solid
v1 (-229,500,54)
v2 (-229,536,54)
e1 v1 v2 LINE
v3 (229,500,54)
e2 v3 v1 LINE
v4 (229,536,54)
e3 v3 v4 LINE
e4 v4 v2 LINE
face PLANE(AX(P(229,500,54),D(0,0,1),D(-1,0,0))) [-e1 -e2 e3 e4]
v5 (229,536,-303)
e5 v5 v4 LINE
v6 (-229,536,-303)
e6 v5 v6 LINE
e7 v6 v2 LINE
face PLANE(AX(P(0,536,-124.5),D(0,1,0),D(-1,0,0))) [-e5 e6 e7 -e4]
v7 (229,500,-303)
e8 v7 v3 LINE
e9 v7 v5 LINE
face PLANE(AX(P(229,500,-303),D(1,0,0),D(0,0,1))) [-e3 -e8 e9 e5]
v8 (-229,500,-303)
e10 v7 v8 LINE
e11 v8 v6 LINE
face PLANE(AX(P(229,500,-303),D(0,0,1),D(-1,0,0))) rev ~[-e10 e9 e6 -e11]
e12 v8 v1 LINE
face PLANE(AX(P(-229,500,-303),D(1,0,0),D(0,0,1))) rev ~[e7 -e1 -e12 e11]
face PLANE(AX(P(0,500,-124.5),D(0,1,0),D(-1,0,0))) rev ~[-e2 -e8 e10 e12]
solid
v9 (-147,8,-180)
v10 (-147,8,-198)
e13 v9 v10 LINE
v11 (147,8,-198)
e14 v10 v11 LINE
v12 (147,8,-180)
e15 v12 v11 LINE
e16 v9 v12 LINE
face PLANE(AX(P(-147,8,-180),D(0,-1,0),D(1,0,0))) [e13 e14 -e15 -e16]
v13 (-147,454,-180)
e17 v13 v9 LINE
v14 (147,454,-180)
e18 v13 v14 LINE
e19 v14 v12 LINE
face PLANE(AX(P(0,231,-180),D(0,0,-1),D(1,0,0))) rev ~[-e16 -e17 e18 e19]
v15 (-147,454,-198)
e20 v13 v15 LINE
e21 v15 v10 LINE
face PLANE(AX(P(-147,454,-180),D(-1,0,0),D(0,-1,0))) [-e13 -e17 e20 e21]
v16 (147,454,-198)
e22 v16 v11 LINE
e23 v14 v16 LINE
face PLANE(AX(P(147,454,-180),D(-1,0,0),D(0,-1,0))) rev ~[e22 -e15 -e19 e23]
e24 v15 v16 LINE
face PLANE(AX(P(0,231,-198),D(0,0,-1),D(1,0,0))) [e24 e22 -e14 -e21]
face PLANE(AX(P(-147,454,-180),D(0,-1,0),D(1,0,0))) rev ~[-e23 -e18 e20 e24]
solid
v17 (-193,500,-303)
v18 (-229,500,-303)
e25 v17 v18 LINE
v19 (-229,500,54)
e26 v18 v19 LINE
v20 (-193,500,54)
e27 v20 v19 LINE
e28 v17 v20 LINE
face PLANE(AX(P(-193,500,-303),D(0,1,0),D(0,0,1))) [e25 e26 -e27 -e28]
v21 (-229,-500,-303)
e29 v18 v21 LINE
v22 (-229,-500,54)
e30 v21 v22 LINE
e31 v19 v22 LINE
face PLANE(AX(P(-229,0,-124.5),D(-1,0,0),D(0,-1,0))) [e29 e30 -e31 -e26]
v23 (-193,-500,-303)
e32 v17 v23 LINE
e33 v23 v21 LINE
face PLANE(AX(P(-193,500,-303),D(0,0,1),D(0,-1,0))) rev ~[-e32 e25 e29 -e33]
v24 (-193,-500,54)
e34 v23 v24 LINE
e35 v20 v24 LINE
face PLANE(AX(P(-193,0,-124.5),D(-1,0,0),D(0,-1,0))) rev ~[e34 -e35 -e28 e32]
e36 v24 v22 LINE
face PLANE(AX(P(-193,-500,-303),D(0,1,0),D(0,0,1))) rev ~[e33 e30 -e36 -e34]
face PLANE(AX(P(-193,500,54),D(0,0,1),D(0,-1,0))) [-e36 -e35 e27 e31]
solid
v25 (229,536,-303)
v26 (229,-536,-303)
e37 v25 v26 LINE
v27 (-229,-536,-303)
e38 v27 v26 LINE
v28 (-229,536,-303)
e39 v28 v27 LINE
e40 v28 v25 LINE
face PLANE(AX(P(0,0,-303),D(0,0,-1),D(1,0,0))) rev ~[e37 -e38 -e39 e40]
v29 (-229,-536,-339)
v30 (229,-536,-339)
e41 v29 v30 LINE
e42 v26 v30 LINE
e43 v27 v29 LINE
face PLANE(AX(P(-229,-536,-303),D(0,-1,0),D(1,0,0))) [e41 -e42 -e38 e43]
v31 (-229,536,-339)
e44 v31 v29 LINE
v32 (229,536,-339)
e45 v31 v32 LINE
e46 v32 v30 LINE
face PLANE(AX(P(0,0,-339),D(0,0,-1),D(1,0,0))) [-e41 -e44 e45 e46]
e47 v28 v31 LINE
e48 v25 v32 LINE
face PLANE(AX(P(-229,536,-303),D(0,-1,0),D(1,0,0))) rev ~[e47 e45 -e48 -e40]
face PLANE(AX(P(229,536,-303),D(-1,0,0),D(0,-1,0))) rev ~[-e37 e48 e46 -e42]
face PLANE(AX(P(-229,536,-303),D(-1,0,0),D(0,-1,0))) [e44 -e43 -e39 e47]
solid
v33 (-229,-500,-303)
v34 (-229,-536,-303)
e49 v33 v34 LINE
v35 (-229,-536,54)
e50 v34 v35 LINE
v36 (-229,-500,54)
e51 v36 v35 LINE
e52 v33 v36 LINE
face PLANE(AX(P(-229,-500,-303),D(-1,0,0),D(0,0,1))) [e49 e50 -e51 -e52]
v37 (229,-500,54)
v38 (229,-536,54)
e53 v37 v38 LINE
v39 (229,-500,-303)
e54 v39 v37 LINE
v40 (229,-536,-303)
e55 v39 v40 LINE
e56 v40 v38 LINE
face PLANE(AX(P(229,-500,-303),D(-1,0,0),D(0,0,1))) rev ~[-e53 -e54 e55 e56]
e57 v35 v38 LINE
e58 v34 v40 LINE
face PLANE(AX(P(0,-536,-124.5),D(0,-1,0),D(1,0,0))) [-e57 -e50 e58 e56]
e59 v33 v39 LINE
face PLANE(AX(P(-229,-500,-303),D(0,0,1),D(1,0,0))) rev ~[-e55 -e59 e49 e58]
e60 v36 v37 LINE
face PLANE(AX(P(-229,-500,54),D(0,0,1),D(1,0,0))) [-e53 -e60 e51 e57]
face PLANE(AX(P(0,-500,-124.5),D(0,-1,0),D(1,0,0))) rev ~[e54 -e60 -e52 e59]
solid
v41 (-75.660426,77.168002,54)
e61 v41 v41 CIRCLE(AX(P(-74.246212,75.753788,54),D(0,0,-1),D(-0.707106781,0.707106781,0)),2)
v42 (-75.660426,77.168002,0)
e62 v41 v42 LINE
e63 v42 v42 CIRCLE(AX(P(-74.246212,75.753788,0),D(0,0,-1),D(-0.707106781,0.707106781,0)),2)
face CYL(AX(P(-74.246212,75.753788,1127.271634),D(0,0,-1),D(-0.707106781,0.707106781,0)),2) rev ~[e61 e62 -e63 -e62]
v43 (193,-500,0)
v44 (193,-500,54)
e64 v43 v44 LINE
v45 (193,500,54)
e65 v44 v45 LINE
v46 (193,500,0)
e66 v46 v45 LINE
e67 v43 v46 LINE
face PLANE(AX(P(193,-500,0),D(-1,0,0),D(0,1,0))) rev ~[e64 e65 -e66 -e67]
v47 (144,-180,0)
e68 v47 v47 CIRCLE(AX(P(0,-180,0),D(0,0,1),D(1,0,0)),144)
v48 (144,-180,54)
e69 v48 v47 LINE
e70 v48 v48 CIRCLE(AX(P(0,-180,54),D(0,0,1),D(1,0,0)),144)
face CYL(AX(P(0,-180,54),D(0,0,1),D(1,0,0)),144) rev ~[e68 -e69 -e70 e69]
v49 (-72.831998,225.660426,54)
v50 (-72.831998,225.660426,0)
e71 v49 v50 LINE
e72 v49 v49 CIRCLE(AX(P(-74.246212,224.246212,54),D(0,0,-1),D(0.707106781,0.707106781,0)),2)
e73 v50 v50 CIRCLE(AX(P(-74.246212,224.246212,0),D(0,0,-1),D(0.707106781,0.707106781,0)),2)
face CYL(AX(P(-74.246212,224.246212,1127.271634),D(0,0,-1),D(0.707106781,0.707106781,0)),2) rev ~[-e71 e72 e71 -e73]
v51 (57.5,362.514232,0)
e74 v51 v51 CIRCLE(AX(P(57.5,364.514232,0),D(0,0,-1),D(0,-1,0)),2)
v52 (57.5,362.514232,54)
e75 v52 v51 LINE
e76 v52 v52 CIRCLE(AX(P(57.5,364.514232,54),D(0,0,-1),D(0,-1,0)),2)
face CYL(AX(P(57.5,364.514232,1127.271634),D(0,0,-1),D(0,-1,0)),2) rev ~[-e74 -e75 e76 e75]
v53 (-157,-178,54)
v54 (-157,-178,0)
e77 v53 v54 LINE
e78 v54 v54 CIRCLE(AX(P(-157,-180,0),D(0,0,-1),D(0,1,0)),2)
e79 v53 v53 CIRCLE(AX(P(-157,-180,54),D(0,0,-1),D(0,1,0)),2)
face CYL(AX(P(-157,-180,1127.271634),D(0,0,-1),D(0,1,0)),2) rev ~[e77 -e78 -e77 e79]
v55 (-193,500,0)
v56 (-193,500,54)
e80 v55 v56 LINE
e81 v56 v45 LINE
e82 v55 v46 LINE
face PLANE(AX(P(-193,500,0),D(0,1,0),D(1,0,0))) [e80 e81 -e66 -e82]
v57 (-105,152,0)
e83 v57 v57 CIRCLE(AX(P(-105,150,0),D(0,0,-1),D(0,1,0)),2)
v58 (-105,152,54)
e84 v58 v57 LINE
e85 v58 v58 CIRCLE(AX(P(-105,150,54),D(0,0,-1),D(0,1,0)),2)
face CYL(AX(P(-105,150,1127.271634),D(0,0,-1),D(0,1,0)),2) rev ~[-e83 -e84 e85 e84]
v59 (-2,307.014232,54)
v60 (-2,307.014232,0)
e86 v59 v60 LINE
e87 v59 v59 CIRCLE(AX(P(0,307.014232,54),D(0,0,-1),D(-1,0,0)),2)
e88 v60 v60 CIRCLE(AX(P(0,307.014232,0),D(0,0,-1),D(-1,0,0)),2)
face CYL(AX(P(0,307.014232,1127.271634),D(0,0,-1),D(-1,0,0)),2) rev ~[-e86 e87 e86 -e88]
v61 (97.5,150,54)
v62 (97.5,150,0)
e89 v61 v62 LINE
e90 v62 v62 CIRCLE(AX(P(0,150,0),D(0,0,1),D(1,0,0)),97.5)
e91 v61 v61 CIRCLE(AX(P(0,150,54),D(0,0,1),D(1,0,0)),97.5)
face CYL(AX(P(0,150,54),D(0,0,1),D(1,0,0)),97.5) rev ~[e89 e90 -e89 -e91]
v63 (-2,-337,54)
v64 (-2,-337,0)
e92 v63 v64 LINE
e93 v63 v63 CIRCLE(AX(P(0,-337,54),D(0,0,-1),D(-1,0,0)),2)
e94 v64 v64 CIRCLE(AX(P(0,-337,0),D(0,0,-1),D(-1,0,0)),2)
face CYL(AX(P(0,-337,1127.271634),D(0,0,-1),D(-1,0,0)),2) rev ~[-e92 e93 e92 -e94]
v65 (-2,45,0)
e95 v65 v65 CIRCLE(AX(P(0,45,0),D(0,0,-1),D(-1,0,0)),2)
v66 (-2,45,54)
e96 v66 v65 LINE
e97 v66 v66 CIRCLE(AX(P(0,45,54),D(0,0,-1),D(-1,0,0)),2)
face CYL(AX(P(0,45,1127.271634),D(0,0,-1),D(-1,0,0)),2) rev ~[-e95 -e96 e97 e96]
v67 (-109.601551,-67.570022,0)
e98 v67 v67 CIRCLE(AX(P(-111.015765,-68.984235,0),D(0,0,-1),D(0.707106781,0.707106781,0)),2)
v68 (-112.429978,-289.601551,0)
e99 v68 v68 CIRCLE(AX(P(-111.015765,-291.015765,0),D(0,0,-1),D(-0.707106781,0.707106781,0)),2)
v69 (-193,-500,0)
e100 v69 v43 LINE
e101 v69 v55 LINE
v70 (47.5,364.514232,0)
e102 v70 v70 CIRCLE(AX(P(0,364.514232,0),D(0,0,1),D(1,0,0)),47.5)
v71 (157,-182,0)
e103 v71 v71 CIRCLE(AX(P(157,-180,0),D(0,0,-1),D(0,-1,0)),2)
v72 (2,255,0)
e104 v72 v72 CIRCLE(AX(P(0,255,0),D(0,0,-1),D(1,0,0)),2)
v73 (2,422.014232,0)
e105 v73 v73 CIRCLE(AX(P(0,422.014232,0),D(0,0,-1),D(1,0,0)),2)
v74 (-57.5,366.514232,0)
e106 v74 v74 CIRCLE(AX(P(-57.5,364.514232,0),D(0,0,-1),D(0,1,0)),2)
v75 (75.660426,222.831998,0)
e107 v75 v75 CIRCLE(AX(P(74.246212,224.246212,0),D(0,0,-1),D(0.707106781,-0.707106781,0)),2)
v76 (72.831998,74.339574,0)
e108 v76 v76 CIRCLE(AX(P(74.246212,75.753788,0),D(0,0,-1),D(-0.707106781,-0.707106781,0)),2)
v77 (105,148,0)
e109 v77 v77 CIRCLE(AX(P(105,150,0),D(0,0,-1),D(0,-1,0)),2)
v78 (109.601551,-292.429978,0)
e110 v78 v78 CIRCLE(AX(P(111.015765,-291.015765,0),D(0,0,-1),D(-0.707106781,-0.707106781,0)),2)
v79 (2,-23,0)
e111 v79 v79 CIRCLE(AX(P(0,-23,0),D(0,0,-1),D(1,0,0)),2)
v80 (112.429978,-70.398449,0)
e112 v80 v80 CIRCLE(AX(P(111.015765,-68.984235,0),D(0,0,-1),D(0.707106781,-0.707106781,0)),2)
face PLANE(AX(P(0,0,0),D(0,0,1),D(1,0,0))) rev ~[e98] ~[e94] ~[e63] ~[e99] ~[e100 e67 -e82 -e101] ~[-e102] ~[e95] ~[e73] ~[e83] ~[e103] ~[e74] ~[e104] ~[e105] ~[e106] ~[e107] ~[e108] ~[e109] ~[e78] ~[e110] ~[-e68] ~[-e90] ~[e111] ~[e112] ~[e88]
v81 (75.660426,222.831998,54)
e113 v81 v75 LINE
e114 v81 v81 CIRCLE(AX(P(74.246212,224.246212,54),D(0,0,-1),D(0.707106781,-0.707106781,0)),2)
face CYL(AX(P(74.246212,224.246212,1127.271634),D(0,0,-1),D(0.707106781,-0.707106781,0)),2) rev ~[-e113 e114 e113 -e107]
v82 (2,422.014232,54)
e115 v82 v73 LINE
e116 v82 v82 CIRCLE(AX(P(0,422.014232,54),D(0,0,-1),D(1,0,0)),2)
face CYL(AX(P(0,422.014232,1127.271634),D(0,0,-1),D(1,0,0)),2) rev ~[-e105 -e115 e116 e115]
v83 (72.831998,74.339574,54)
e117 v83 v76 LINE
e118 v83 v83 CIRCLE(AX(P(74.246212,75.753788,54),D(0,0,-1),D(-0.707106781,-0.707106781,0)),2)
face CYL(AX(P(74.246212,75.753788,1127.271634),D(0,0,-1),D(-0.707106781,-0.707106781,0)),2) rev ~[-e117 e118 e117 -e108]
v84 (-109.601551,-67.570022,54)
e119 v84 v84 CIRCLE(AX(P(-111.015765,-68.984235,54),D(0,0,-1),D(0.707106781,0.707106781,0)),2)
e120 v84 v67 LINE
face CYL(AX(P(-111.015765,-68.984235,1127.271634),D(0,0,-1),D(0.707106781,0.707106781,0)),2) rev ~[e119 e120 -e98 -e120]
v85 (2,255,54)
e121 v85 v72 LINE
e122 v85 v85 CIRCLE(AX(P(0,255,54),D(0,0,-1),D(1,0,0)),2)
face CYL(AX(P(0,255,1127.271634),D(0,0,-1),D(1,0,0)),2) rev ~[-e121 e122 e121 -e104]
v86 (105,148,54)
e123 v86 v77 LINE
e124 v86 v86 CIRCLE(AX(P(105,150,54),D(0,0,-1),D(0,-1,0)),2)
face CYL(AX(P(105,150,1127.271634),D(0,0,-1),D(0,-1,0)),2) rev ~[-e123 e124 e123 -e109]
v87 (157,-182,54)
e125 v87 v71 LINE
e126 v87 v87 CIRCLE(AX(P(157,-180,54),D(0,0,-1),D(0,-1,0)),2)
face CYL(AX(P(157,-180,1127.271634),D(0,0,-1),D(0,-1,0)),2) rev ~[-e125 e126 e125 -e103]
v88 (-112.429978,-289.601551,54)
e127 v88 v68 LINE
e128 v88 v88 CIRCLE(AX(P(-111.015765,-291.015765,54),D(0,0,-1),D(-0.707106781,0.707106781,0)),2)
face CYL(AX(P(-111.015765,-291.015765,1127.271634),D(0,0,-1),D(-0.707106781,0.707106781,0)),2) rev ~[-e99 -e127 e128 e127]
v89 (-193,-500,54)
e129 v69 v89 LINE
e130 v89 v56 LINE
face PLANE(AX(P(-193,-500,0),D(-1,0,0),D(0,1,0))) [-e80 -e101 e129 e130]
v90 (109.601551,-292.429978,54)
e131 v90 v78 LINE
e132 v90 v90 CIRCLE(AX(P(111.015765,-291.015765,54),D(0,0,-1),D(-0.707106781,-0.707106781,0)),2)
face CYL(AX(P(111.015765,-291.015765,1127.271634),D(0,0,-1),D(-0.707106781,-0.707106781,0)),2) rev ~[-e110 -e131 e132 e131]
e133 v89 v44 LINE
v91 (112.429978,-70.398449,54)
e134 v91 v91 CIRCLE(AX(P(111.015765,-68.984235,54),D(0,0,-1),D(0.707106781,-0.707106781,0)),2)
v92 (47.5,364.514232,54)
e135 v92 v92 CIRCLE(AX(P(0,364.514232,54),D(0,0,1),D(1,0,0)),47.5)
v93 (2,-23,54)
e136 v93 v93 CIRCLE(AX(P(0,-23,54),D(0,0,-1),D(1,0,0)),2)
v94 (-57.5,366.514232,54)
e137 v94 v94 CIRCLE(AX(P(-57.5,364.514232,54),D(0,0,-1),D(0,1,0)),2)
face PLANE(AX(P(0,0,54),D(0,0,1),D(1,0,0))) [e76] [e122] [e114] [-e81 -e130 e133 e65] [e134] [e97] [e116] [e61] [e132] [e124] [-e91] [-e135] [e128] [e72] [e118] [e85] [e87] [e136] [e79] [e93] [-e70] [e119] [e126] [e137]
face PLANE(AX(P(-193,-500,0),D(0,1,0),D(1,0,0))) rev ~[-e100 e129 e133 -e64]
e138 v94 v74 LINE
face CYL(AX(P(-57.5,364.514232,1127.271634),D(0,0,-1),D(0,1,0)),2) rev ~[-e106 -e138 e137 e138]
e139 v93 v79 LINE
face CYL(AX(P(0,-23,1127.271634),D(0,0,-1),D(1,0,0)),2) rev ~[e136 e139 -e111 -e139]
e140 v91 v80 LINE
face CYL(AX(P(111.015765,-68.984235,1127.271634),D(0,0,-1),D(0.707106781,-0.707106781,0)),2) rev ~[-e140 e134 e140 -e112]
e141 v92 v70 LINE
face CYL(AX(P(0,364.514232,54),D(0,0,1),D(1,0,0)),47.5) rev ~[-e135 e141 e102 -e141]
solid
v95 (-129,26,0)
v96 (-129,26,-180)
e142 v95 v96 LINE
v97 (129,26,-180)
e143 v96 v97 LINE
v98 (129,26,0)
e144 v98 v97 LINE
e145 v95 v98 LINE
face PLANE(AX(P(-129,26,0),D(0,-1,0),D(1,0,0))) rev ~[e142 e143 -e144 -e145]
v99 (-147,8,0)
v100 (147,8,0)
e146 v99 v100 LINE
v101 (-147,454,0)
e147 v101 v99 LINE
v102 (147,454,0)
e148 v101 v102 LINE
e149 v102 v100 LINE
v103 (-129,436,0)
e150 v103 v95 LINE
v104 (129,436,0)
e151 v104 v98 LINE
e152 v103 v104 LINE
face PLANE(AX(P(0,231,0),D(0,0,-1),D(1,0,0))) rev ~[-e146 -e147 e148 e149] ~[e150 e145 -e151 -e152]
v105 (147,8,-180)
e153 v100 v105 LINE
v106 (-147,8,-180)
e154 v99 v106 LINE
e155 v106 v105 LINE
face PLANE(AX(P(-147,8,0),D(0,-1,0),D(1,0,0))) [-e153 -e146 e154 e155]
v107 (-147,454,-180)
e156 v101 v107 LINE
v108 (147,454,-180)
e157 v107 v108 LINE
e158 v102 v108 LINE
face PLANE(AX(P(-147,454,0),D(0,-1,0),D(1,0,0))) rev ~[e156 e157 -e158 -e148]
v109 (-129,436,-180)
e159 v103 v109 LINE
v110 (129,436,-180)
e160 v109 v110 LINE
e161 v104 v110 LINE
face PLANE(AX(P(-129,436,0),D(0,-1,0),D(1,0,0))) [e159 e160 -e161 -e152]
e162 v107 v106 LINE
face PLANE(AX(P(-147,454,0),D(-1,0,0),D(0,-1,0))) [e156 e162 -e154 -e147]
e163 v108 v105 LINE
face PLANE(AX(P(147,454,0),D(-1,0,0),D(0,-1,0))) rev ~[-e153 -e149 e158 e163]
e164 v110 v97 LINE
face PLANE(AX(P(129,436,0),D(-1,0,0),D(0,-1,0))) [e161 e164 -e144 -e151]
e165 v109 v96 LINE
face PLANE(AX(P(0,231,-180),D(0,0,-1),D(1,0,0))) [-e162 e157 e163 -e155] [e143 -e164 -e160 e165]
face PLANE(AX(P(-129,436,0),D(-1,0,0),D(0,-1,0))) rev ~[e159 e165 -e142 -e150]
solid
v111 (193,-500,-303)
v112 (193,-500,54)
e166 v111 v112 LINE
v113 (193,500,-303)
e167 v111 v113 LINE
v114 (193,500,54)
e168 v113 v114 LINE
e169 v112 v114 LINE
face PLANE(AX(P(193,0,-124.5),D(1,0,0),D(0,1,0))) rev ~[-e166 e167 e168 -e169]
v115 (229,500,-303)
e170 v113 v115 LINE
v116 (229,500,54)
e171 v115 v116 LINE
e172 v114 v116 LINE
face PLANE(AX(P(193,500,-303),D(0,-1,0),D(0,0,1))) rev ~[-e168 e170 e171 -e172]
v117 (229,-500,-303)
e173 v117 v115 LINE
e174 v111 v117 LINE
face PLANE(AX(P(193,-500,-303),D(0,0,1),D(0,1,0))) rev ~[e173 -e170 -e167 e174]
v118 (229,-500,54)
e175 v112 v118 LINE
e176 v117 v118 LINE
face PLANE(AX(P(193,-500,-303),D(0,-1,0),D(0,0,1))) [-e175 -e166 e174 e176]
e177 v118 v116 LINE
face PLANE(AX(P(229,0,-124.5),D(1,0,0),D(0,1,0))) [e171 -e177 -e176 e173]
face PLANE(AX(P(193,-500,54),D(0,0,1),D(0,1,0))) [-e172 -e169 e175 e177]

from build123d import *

# Parameters (mm, degrees)
F0_W             = 386
F0_H             = 1000
F1_DEPTH         = 54
F2_R             = 144
F2_R_2           = 97.5
F2_R_3           = 47.5
F3_DEPTH         = 80
F4_W             = 1000
F4_H             = 357
F5_DEPTH         = 36
F6_W             = 1000
F6_H             = 357
F7_DEPTH         = 36
F8_W             = 294
F8_H             = 446
F8_W_2           = 258
F8_H_2           = 410
F9_DEPTH         = 180
F10_W            = 294
F10_H            = 446
F11_DEPTH        = 18
F12_W            = 458
F12_H            = 357
F13_DEPTH        = 36
F14_W            = 458
F14_H            = 357
F15_DEPTH        = 36
F16_W            = 458
F16_H            = 1072
F17_DEPTH        = 36
F19_D            = 4
F19_COPIES_COUNT = 8
F21_D            = 4
F21_COPIES_COUNT = 8
F23_D            = 4
F23_COPIES_COUNT = 4


# Not quite as in the source:
# - a pattern or mirror of a feature is missing from the dataset's text; its kind, count and spacing are read off the source's solid


with BuildPart() as f1:
    # F0 (on Top) → F1 (new body)
    with BuildSketch(Plane.XY):
        Rectangle(F0_W, F0_H)
    extrude(amount=F1_DEPTH)

    # F2 (on face) → F3 (cut)
    with BuildSketch(Plane.XY.offset(54)):
        with Locations((0, -180)):
            Circle(F2_R)
        with Locations((0, 150)):
            Circle(F2_R_2)
        with Locations((0, 364.5142316818)):
            Circle(F2_R_3)
    extrude(amount=-F3_DEPTH, mode=Mode.SUBTRACT)

    # F19 (through all)
    with Locations(Plane.XY.offset(54)):
        with Locations((0, -337)):
            f19 = Hole(F19_D / 2)

    # F19_copies: F19 ×8 about axis
    f19_copies_axis = Axis((0, -180, 0), (0, 0, 1))
    for i in range(1, F19_COPIES_COUNT):
        add(f19.rotate(f19_copies_axis, i * 360 / F19_COPIES_COUNT), mode=Mode.SUBTRACT)

    # F21 (through all)
    with Locations(Plane.XY.offset(54)):
        with Locations((0, 45)):
            f21 = Hole(F21_D / 2)

    # F21_copies: F21 ×8 about axis
    f21_copies_axis = Axis((0, 150, 0), (0, 0, 1))
    for i in range(1, F21_COPIES_COUNT):
        add(f21.rotate(f21_copies_axis, i * 360 / F21_COPIES_COUNT), mode=Mode.SUBTRACT)

    # F23 (through all)
    with Locations(Plane.XY.offset(54)):
        with Locations((0, 307.0142316818)):
            f23 = Hole(F23_D / 2)

    # F23_copies: F23 ×4 about axis
    f23_copies_axis = Axis((0, 364.514232, 0), (0, 0, 1))
    for i in range(1, F23_COPIES_COUNT):
        add(f23.rotate(f23_copies_axis, i * 360 / F23_COPIES_COUNT), mode=Mode.SUBTRACT)


with BuildPart() as f5:
    # F4 (on face) → F5 (new body)
    with BuildSketch(Plane(origin=(-193, 0, 0), x_dir=(0, -1, 0), z_dir=(-1, 0, 0))):
        with Locations((0, -124.5)):
            Rectangle(F4_W, F4_H)
    extrude(amount=F5_DEPTH)


with BuildPart() as f7:
    # F6 (on face) → F7 (new body)
    with BuildSketch(Plane.YZ.offset(193)):
        with Locations((0, -124.5)):
            Rectangle(F6_W, F6_H)
    extrude(amount=F7_DEPTH)


with BuildPart() as f9:
    # F8 (on face) → F9 (new body)
    with BuildSketch(Plane(origin=(0, 0, 0), x_dir=(1, 0, 0), z_dir=(0, 0, -1))):
        with Locations((0, -231)):
            Rectangle(F8_W, F8_H)
        with Locations((0, -231)):
            Rectangle(F8_W_2, F8_H_2, mode=Mode.SUBTRACT)
    extrude(amount=F9_DEPTH)


with BuildPart() as f11:
    # F10 (on face) → F11 (new body)
    with BuildSketch(Plane(origin=(0, 0, -180), x_dir=(1, 0, 0), z_dir=(0, 0, -1))):
        with Locations((0, -231)):
            Rectangle(F10_W, F10_H)
    extrude(amount=F11_DEPTH)


with BuildPart() as f13:
    # F12 (on face) → F13 (new body)
    with BuildSketch(Plane(origin=(0, 500, 0), x_dir=(-1, 0, 0), z_dir=(0, 1, 0))):
        with Locations((0, -124.5)):
            Rectangle(F12_W, F12_H)
    extrude(amount=F13_DEPTH)


with BuildPart() as f15:
    # F14 (on face) → F15 (new body)
    with BuildSketch(Plane.XZ.offset(500)):
        with Locations((0, -124.5)):
            Rectangle(F14_W, F14_H)
    extrude(amount=F15_DEPTH)


with BuildPart() as f17:
    # F16 (on face) → F17 (new body)
    with BuildSketch(Plane(origin=(0, 0, -303), x_dir=(1, 0, 0), z_dir=(0, 0, -1))):
        Rectangle(F16_W, F16_H)
    extrude(amount=F17_DEPTH)


solid = Compound([f1.part, f5.part, f7.part, f9.part, f11.part, f13.part, f15.part, f17.part])
